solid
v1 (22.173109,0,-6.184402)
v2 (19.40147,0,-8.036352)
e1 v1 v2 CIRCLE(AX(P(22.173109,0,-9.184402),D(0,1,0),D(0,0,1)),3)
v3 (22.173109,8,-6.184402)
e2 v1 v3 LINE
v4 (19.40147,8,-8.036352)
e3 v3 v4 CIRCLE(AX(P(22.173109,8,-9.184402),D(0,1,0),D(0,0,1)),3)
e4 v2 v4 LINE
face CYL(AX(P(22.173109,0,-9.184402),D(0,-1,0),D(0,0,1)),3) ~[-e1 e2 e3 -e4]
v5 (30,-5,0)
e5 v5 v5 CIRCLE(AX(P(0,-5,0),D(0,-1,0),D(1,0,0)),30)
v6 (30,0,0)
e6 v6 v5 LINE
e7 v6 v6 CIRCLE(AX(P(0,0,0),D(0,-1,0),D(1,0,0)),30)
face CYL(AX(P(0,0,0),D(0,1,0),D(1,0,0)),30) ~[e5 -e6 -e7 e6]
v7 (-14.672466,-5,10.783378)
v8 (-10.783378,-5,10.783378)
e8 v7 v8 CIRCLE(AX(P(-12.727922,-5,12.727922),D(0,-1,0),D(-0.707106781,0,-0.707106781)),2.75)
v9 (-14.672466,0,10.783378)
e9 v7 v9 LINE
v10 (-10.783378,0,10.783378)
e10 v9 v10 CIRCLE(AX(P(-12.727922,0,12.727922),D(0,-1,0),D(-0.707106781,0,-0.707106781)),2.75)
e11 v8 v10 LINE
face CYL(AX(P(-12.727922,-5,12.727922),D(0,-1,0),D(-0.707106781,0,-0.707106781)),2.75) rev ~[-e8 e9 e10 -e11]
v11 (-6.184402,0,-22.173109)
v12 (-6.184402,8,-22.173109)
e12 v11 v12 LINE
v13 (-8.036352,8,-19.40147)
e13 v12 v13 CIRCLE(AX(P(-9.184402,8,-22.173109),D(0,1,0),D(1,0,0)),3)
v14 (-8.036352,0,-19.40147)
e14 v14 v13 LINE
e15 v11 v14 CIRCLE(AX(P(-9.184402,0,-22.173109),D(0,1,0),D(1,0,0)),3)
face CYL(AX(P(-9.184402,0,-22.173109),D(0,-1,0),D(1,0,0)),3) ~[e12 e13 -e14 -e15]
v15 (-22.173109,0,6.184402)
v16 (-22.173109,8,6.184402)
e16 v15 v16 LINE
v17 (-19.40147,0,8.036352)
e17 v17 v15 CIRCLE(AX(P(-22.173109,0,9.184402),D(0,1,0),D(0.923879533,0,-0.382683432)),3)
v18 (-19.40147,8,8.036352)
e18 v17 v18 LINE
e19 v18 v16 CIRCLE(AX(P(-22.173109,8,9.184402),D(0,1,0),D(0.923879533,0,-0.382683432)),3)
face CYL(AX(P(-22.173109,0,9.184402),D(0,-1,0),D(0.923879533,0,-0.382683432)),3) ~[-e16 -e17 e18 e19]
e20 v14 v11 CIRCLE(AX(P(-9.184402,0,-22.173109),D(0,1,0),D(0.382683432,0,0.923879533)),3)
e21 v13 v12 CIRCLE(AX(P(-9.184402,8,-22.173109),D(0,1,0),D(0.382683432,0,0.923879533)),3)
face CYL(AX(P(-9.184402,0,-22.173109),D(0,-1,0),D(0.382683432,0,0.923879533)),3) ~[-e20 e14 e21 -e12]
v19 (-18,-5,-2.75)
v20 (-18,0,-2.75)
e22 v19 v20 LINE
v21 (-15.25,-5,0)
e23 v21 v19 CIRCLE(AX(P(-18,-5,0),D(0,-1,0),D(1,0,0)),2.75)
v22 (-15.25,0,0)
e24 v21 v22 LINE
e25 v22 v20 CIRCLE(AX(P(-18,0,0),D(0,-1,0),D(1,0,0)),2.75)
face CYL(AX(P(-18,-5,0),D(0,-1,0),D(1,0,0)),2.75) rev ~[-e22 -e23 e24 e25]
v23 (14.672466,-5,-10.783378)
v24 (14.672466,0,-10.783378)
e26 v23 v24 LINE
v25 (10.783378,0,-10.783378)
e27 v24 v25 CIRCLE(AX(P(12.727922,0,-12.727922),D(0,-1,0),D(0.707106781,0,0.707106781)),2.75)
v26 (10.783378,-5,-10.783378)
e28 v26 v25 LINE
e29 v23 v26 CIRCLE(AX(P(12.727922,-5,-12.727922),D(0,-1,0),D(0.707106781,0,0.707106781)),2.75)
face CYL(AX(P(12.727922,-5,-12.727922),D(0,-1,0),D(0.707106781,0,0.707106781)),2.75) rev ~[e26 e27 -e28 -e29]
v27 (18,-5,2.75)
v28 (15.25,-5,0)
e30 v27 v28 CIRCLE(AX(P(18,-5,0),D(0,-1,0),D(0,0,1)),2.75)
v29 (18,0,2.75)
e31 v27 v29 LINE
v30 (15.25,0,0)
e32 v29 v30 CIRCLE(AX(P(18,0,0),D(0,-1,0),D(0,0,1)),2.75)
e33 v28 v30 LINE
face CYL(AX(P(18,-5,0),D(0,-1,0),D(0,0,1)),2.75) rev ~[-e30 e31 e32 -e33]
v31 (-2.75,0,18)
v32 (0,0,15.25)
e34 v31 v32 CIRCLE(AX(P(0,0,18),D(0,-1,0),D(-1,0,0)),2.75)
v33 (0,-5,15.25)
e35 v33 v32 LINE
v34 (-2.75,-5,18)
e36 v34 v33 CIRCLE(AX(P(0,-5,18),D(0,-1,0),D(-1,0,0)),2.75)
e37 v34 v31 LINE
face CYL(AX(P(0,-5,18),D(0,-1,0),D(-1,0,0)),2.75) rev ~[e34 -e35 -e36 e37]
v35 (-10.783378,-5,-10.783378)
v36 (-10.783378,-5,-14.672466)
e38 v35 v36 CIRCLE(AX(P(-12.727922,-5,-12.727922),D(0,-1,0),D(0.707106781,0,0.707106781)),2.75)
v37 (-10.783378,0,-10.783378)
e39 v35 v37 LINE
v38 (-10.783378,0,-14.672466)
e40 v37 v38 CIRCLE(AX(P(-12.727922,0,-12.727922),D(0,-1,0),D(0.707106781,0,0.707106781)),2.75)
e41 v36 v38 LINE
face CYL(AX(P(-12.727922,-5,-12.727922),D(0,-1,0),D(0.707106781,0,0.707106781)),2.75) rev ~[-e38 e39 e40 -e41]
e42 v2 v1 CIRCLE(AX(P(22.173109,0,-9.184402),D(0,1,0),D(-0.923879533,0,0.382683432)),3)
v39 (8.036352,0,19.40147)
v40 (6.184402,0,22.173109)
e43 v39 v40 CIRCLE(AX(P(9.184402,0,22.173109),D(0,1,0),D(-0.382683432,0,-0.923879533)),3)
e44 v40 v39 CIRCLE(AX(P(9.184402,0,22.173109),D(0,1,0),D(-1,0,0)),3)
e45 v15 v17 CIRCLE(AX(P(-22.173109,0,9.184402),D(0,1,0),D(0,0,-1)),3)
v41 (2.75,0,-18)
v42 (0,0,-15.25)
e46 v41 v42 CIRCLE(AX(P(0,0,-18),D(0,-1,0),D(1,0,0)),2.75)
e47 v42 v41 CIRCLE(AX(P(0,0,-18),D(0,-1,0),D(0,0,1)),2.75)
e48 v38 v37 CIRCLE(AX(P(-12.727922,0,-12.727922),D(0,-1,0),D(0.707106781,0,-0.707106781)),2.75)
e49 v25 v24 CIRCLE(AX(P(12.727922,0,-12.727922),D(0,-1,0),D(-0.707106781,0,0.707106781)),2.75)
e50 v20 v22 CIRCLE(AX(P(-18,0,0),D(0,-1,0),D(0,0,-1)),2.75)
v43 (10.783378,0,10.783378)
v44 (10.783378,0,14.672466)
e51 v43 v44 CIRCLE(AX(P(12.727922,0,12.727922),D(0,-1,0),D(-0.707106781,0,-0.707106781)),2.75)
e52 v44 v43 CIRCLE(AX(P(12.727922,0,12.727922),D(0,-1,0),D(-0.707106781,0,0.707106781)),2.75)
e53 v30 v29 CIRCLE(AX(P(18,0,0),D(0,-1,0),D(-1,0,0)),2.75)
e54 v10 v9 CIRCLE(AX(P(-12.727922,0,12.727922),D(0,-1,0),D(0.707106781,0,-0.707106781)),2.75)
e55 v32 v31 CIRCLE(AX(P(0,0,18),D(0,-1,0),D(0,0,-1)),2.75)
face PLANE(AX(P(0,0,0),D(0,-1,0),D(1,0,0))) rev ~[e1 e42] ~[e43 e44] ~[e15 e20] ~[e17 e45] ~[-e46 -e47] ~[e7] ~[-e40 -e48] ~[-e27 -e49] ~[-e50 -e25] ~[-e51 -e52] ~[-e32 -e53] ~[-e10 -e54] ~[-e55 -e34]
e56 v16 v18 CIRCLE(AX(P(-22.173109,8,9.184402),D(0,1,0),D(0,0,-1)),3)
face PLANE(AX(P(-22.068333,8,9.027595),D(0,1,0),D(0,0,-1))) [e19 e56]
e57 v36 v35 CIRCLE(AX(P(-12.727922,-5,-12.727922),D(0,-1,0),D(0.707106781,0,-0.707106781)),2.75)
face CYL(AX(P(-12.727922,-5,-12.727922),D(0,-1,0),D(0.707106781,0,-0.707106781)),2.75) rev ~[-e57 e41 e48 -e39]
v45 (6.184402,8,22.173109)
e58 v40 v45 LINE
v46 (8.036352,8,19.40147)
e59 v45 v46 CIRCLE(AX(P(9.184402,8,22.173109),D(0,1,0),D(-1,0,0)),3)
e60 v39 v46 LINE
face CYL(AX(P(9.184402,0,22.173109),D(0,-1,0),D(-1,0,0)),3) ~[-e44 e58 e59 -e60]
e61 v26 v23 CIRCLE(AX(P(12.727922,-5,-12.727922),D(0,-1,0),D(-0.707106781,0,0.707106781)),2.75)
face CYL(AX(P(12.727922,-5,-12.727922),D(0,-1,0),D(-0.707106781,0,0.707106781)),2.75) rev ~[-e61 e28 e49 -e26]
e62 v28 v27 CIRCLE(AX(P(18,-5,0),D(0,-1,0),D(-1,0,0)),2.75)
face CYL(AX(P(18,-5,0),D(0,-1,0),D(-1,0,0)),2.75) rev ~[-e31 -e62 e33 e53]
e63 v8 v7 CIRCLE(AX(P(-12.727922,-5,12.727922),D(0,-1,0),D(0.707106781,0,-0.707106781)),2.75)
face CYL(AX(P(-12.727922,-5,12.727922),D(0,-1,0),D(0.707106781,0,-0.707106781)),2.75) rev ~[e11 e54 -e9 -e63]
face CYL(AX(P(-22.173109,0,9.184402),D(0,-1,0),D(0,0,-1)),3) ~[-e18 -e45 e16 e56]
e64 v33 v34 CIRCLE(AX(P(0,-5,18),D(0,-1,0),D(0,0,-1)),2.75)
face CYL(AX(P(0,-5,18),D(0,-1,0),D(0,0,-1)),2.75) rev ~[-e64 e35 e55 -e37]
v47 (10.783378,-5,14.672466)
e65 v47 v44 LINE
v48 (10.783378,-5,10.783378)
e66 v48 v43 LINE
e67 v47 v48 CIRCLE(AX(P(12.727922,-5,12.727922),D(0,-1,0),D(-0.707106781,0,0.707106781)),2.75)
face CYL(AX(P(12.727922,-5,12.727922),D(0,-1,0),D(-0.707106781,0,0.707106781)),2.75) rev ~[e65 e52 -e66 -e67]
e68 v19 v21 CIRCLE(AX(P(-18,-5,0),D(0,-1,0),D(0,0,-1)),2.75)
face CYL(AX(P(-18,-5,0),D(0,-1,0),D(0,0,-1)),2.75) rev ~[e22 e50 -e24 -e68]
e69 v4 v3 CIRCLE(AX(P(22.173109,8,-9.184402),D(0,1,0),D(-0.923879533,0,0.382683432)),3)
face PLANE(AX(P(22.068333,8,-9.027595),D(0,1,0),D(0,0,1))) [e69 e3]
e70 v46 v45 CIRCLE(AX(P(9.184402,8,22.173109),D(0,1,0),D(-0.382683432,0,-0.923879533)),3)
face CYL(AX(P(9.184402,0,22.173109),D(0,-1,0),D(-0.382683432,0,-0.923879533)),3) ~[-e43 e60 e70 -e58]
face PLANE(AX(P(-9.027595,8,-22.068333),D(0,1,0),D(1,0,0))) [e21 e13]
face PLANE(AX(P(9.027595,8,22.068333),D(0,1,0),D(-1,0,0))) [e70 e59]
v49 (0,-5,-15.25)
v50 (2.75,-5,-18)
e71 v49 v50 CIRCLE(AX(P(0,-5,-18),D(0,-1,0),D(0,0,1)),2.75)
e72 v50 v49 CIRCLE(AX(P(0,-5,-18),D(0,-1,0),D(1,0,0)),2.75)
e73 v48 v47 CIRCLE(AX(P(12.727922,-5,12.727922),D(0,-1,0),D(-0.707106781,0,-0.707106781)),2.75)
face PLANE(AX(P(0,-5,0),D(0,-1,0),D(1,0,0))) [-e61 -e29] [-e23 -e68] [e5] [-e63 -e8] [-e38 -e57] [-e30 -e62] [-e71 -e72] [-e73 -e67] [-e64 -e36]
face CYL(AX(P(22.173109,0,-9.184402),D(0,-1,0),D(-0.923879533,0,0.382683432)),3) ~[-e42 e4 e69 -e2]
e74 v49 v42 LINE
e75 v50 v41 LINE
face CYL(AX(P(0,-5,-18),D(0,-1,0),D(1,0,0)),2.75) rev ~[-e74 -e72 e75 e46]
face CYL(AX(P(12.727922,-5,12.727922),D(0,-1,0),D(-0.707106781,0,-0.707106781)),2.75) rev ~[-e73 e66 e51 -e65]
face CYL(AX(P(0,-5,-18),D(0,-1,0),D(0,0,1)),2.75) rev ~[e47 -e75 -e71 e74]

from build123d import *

# Parameters (mm, degrees)
F0_R            = 30
F1_DEPTH        = 5
F3_DEPTH        = 25
F3_COPIES_COUNT = 8
F5_DEPTH        = 8
F5_COPIES_COUNT = 4


# Not quite as in the source:
# - a pattern or mirror of a feature is missing from the dataset's text; its kind, count and spacing are read off the source's solid
# - a feature names something its author has since deleted; it is built from what else it names


with BuildPart() as f1:
    # F0 (on Front) → F1 (new body)
    with BuildSketch(Plane.XZ):
        Circle(F0_R)
    extrude(amount=F1_DEPTH)

    # F2 (on face) → F3 (cut)
    with BuildSketch(Plane.XZ.offset(5)):
        with BuildLine():
            ThreePointArc((0, -15.25), (-1.9445436483, -19.9445436483), (2.75, -18))
            ThreePointArc((2.75, -18), (1.9445436483, -16.0554563517), (0, -15.25))
        make_face()
    f3 = extrude(amount=-F3_DEPTH, mode=Mode.SUBTRACT)

    # F3_copies: F3 ×8 about axis
    f3_copies_axis = Axis((0, 0, 0), (0, 1, 0))
    for i in range(1, F3_COPIES_COUNT):
        add(f3.rotate(f3_copies_axis, i * 360 / F3_COPIES_COUNT), mode=Mode.SUBTRACT)

    # F4 (on face) → F5 (join)
    with BuildSketch(Plane(origin=(0, 0, 0), x_dir=(-1, 0, 0), z_dir=(0, 1, 0))):
        with BuildLine():
            ThreePointArc((-8.0363520797, 19.4014701827), (-6.6899935399, 20.5063980812), (-6.1844023768, 22.1731087803))
            ThreePointArc((-6.1844023768, 22.1731087803), (-11.6788112137, 23.8398194793), (-8.0363520797, 19.4014701827))
        make_face()
    f5 = extrude(amount=F5_DEPTH)

    # F5_copies: F5 ×4 about axis
    f5_copies_axis = Axis((0, 0, 0), (0, 1, 0))
    for i in range(1, F5_COPIES_COUNT):
        add(f5.rotate(f5_copies_axis, i * 360 / F5_COPIES_COUNT))


solid = f1.part
